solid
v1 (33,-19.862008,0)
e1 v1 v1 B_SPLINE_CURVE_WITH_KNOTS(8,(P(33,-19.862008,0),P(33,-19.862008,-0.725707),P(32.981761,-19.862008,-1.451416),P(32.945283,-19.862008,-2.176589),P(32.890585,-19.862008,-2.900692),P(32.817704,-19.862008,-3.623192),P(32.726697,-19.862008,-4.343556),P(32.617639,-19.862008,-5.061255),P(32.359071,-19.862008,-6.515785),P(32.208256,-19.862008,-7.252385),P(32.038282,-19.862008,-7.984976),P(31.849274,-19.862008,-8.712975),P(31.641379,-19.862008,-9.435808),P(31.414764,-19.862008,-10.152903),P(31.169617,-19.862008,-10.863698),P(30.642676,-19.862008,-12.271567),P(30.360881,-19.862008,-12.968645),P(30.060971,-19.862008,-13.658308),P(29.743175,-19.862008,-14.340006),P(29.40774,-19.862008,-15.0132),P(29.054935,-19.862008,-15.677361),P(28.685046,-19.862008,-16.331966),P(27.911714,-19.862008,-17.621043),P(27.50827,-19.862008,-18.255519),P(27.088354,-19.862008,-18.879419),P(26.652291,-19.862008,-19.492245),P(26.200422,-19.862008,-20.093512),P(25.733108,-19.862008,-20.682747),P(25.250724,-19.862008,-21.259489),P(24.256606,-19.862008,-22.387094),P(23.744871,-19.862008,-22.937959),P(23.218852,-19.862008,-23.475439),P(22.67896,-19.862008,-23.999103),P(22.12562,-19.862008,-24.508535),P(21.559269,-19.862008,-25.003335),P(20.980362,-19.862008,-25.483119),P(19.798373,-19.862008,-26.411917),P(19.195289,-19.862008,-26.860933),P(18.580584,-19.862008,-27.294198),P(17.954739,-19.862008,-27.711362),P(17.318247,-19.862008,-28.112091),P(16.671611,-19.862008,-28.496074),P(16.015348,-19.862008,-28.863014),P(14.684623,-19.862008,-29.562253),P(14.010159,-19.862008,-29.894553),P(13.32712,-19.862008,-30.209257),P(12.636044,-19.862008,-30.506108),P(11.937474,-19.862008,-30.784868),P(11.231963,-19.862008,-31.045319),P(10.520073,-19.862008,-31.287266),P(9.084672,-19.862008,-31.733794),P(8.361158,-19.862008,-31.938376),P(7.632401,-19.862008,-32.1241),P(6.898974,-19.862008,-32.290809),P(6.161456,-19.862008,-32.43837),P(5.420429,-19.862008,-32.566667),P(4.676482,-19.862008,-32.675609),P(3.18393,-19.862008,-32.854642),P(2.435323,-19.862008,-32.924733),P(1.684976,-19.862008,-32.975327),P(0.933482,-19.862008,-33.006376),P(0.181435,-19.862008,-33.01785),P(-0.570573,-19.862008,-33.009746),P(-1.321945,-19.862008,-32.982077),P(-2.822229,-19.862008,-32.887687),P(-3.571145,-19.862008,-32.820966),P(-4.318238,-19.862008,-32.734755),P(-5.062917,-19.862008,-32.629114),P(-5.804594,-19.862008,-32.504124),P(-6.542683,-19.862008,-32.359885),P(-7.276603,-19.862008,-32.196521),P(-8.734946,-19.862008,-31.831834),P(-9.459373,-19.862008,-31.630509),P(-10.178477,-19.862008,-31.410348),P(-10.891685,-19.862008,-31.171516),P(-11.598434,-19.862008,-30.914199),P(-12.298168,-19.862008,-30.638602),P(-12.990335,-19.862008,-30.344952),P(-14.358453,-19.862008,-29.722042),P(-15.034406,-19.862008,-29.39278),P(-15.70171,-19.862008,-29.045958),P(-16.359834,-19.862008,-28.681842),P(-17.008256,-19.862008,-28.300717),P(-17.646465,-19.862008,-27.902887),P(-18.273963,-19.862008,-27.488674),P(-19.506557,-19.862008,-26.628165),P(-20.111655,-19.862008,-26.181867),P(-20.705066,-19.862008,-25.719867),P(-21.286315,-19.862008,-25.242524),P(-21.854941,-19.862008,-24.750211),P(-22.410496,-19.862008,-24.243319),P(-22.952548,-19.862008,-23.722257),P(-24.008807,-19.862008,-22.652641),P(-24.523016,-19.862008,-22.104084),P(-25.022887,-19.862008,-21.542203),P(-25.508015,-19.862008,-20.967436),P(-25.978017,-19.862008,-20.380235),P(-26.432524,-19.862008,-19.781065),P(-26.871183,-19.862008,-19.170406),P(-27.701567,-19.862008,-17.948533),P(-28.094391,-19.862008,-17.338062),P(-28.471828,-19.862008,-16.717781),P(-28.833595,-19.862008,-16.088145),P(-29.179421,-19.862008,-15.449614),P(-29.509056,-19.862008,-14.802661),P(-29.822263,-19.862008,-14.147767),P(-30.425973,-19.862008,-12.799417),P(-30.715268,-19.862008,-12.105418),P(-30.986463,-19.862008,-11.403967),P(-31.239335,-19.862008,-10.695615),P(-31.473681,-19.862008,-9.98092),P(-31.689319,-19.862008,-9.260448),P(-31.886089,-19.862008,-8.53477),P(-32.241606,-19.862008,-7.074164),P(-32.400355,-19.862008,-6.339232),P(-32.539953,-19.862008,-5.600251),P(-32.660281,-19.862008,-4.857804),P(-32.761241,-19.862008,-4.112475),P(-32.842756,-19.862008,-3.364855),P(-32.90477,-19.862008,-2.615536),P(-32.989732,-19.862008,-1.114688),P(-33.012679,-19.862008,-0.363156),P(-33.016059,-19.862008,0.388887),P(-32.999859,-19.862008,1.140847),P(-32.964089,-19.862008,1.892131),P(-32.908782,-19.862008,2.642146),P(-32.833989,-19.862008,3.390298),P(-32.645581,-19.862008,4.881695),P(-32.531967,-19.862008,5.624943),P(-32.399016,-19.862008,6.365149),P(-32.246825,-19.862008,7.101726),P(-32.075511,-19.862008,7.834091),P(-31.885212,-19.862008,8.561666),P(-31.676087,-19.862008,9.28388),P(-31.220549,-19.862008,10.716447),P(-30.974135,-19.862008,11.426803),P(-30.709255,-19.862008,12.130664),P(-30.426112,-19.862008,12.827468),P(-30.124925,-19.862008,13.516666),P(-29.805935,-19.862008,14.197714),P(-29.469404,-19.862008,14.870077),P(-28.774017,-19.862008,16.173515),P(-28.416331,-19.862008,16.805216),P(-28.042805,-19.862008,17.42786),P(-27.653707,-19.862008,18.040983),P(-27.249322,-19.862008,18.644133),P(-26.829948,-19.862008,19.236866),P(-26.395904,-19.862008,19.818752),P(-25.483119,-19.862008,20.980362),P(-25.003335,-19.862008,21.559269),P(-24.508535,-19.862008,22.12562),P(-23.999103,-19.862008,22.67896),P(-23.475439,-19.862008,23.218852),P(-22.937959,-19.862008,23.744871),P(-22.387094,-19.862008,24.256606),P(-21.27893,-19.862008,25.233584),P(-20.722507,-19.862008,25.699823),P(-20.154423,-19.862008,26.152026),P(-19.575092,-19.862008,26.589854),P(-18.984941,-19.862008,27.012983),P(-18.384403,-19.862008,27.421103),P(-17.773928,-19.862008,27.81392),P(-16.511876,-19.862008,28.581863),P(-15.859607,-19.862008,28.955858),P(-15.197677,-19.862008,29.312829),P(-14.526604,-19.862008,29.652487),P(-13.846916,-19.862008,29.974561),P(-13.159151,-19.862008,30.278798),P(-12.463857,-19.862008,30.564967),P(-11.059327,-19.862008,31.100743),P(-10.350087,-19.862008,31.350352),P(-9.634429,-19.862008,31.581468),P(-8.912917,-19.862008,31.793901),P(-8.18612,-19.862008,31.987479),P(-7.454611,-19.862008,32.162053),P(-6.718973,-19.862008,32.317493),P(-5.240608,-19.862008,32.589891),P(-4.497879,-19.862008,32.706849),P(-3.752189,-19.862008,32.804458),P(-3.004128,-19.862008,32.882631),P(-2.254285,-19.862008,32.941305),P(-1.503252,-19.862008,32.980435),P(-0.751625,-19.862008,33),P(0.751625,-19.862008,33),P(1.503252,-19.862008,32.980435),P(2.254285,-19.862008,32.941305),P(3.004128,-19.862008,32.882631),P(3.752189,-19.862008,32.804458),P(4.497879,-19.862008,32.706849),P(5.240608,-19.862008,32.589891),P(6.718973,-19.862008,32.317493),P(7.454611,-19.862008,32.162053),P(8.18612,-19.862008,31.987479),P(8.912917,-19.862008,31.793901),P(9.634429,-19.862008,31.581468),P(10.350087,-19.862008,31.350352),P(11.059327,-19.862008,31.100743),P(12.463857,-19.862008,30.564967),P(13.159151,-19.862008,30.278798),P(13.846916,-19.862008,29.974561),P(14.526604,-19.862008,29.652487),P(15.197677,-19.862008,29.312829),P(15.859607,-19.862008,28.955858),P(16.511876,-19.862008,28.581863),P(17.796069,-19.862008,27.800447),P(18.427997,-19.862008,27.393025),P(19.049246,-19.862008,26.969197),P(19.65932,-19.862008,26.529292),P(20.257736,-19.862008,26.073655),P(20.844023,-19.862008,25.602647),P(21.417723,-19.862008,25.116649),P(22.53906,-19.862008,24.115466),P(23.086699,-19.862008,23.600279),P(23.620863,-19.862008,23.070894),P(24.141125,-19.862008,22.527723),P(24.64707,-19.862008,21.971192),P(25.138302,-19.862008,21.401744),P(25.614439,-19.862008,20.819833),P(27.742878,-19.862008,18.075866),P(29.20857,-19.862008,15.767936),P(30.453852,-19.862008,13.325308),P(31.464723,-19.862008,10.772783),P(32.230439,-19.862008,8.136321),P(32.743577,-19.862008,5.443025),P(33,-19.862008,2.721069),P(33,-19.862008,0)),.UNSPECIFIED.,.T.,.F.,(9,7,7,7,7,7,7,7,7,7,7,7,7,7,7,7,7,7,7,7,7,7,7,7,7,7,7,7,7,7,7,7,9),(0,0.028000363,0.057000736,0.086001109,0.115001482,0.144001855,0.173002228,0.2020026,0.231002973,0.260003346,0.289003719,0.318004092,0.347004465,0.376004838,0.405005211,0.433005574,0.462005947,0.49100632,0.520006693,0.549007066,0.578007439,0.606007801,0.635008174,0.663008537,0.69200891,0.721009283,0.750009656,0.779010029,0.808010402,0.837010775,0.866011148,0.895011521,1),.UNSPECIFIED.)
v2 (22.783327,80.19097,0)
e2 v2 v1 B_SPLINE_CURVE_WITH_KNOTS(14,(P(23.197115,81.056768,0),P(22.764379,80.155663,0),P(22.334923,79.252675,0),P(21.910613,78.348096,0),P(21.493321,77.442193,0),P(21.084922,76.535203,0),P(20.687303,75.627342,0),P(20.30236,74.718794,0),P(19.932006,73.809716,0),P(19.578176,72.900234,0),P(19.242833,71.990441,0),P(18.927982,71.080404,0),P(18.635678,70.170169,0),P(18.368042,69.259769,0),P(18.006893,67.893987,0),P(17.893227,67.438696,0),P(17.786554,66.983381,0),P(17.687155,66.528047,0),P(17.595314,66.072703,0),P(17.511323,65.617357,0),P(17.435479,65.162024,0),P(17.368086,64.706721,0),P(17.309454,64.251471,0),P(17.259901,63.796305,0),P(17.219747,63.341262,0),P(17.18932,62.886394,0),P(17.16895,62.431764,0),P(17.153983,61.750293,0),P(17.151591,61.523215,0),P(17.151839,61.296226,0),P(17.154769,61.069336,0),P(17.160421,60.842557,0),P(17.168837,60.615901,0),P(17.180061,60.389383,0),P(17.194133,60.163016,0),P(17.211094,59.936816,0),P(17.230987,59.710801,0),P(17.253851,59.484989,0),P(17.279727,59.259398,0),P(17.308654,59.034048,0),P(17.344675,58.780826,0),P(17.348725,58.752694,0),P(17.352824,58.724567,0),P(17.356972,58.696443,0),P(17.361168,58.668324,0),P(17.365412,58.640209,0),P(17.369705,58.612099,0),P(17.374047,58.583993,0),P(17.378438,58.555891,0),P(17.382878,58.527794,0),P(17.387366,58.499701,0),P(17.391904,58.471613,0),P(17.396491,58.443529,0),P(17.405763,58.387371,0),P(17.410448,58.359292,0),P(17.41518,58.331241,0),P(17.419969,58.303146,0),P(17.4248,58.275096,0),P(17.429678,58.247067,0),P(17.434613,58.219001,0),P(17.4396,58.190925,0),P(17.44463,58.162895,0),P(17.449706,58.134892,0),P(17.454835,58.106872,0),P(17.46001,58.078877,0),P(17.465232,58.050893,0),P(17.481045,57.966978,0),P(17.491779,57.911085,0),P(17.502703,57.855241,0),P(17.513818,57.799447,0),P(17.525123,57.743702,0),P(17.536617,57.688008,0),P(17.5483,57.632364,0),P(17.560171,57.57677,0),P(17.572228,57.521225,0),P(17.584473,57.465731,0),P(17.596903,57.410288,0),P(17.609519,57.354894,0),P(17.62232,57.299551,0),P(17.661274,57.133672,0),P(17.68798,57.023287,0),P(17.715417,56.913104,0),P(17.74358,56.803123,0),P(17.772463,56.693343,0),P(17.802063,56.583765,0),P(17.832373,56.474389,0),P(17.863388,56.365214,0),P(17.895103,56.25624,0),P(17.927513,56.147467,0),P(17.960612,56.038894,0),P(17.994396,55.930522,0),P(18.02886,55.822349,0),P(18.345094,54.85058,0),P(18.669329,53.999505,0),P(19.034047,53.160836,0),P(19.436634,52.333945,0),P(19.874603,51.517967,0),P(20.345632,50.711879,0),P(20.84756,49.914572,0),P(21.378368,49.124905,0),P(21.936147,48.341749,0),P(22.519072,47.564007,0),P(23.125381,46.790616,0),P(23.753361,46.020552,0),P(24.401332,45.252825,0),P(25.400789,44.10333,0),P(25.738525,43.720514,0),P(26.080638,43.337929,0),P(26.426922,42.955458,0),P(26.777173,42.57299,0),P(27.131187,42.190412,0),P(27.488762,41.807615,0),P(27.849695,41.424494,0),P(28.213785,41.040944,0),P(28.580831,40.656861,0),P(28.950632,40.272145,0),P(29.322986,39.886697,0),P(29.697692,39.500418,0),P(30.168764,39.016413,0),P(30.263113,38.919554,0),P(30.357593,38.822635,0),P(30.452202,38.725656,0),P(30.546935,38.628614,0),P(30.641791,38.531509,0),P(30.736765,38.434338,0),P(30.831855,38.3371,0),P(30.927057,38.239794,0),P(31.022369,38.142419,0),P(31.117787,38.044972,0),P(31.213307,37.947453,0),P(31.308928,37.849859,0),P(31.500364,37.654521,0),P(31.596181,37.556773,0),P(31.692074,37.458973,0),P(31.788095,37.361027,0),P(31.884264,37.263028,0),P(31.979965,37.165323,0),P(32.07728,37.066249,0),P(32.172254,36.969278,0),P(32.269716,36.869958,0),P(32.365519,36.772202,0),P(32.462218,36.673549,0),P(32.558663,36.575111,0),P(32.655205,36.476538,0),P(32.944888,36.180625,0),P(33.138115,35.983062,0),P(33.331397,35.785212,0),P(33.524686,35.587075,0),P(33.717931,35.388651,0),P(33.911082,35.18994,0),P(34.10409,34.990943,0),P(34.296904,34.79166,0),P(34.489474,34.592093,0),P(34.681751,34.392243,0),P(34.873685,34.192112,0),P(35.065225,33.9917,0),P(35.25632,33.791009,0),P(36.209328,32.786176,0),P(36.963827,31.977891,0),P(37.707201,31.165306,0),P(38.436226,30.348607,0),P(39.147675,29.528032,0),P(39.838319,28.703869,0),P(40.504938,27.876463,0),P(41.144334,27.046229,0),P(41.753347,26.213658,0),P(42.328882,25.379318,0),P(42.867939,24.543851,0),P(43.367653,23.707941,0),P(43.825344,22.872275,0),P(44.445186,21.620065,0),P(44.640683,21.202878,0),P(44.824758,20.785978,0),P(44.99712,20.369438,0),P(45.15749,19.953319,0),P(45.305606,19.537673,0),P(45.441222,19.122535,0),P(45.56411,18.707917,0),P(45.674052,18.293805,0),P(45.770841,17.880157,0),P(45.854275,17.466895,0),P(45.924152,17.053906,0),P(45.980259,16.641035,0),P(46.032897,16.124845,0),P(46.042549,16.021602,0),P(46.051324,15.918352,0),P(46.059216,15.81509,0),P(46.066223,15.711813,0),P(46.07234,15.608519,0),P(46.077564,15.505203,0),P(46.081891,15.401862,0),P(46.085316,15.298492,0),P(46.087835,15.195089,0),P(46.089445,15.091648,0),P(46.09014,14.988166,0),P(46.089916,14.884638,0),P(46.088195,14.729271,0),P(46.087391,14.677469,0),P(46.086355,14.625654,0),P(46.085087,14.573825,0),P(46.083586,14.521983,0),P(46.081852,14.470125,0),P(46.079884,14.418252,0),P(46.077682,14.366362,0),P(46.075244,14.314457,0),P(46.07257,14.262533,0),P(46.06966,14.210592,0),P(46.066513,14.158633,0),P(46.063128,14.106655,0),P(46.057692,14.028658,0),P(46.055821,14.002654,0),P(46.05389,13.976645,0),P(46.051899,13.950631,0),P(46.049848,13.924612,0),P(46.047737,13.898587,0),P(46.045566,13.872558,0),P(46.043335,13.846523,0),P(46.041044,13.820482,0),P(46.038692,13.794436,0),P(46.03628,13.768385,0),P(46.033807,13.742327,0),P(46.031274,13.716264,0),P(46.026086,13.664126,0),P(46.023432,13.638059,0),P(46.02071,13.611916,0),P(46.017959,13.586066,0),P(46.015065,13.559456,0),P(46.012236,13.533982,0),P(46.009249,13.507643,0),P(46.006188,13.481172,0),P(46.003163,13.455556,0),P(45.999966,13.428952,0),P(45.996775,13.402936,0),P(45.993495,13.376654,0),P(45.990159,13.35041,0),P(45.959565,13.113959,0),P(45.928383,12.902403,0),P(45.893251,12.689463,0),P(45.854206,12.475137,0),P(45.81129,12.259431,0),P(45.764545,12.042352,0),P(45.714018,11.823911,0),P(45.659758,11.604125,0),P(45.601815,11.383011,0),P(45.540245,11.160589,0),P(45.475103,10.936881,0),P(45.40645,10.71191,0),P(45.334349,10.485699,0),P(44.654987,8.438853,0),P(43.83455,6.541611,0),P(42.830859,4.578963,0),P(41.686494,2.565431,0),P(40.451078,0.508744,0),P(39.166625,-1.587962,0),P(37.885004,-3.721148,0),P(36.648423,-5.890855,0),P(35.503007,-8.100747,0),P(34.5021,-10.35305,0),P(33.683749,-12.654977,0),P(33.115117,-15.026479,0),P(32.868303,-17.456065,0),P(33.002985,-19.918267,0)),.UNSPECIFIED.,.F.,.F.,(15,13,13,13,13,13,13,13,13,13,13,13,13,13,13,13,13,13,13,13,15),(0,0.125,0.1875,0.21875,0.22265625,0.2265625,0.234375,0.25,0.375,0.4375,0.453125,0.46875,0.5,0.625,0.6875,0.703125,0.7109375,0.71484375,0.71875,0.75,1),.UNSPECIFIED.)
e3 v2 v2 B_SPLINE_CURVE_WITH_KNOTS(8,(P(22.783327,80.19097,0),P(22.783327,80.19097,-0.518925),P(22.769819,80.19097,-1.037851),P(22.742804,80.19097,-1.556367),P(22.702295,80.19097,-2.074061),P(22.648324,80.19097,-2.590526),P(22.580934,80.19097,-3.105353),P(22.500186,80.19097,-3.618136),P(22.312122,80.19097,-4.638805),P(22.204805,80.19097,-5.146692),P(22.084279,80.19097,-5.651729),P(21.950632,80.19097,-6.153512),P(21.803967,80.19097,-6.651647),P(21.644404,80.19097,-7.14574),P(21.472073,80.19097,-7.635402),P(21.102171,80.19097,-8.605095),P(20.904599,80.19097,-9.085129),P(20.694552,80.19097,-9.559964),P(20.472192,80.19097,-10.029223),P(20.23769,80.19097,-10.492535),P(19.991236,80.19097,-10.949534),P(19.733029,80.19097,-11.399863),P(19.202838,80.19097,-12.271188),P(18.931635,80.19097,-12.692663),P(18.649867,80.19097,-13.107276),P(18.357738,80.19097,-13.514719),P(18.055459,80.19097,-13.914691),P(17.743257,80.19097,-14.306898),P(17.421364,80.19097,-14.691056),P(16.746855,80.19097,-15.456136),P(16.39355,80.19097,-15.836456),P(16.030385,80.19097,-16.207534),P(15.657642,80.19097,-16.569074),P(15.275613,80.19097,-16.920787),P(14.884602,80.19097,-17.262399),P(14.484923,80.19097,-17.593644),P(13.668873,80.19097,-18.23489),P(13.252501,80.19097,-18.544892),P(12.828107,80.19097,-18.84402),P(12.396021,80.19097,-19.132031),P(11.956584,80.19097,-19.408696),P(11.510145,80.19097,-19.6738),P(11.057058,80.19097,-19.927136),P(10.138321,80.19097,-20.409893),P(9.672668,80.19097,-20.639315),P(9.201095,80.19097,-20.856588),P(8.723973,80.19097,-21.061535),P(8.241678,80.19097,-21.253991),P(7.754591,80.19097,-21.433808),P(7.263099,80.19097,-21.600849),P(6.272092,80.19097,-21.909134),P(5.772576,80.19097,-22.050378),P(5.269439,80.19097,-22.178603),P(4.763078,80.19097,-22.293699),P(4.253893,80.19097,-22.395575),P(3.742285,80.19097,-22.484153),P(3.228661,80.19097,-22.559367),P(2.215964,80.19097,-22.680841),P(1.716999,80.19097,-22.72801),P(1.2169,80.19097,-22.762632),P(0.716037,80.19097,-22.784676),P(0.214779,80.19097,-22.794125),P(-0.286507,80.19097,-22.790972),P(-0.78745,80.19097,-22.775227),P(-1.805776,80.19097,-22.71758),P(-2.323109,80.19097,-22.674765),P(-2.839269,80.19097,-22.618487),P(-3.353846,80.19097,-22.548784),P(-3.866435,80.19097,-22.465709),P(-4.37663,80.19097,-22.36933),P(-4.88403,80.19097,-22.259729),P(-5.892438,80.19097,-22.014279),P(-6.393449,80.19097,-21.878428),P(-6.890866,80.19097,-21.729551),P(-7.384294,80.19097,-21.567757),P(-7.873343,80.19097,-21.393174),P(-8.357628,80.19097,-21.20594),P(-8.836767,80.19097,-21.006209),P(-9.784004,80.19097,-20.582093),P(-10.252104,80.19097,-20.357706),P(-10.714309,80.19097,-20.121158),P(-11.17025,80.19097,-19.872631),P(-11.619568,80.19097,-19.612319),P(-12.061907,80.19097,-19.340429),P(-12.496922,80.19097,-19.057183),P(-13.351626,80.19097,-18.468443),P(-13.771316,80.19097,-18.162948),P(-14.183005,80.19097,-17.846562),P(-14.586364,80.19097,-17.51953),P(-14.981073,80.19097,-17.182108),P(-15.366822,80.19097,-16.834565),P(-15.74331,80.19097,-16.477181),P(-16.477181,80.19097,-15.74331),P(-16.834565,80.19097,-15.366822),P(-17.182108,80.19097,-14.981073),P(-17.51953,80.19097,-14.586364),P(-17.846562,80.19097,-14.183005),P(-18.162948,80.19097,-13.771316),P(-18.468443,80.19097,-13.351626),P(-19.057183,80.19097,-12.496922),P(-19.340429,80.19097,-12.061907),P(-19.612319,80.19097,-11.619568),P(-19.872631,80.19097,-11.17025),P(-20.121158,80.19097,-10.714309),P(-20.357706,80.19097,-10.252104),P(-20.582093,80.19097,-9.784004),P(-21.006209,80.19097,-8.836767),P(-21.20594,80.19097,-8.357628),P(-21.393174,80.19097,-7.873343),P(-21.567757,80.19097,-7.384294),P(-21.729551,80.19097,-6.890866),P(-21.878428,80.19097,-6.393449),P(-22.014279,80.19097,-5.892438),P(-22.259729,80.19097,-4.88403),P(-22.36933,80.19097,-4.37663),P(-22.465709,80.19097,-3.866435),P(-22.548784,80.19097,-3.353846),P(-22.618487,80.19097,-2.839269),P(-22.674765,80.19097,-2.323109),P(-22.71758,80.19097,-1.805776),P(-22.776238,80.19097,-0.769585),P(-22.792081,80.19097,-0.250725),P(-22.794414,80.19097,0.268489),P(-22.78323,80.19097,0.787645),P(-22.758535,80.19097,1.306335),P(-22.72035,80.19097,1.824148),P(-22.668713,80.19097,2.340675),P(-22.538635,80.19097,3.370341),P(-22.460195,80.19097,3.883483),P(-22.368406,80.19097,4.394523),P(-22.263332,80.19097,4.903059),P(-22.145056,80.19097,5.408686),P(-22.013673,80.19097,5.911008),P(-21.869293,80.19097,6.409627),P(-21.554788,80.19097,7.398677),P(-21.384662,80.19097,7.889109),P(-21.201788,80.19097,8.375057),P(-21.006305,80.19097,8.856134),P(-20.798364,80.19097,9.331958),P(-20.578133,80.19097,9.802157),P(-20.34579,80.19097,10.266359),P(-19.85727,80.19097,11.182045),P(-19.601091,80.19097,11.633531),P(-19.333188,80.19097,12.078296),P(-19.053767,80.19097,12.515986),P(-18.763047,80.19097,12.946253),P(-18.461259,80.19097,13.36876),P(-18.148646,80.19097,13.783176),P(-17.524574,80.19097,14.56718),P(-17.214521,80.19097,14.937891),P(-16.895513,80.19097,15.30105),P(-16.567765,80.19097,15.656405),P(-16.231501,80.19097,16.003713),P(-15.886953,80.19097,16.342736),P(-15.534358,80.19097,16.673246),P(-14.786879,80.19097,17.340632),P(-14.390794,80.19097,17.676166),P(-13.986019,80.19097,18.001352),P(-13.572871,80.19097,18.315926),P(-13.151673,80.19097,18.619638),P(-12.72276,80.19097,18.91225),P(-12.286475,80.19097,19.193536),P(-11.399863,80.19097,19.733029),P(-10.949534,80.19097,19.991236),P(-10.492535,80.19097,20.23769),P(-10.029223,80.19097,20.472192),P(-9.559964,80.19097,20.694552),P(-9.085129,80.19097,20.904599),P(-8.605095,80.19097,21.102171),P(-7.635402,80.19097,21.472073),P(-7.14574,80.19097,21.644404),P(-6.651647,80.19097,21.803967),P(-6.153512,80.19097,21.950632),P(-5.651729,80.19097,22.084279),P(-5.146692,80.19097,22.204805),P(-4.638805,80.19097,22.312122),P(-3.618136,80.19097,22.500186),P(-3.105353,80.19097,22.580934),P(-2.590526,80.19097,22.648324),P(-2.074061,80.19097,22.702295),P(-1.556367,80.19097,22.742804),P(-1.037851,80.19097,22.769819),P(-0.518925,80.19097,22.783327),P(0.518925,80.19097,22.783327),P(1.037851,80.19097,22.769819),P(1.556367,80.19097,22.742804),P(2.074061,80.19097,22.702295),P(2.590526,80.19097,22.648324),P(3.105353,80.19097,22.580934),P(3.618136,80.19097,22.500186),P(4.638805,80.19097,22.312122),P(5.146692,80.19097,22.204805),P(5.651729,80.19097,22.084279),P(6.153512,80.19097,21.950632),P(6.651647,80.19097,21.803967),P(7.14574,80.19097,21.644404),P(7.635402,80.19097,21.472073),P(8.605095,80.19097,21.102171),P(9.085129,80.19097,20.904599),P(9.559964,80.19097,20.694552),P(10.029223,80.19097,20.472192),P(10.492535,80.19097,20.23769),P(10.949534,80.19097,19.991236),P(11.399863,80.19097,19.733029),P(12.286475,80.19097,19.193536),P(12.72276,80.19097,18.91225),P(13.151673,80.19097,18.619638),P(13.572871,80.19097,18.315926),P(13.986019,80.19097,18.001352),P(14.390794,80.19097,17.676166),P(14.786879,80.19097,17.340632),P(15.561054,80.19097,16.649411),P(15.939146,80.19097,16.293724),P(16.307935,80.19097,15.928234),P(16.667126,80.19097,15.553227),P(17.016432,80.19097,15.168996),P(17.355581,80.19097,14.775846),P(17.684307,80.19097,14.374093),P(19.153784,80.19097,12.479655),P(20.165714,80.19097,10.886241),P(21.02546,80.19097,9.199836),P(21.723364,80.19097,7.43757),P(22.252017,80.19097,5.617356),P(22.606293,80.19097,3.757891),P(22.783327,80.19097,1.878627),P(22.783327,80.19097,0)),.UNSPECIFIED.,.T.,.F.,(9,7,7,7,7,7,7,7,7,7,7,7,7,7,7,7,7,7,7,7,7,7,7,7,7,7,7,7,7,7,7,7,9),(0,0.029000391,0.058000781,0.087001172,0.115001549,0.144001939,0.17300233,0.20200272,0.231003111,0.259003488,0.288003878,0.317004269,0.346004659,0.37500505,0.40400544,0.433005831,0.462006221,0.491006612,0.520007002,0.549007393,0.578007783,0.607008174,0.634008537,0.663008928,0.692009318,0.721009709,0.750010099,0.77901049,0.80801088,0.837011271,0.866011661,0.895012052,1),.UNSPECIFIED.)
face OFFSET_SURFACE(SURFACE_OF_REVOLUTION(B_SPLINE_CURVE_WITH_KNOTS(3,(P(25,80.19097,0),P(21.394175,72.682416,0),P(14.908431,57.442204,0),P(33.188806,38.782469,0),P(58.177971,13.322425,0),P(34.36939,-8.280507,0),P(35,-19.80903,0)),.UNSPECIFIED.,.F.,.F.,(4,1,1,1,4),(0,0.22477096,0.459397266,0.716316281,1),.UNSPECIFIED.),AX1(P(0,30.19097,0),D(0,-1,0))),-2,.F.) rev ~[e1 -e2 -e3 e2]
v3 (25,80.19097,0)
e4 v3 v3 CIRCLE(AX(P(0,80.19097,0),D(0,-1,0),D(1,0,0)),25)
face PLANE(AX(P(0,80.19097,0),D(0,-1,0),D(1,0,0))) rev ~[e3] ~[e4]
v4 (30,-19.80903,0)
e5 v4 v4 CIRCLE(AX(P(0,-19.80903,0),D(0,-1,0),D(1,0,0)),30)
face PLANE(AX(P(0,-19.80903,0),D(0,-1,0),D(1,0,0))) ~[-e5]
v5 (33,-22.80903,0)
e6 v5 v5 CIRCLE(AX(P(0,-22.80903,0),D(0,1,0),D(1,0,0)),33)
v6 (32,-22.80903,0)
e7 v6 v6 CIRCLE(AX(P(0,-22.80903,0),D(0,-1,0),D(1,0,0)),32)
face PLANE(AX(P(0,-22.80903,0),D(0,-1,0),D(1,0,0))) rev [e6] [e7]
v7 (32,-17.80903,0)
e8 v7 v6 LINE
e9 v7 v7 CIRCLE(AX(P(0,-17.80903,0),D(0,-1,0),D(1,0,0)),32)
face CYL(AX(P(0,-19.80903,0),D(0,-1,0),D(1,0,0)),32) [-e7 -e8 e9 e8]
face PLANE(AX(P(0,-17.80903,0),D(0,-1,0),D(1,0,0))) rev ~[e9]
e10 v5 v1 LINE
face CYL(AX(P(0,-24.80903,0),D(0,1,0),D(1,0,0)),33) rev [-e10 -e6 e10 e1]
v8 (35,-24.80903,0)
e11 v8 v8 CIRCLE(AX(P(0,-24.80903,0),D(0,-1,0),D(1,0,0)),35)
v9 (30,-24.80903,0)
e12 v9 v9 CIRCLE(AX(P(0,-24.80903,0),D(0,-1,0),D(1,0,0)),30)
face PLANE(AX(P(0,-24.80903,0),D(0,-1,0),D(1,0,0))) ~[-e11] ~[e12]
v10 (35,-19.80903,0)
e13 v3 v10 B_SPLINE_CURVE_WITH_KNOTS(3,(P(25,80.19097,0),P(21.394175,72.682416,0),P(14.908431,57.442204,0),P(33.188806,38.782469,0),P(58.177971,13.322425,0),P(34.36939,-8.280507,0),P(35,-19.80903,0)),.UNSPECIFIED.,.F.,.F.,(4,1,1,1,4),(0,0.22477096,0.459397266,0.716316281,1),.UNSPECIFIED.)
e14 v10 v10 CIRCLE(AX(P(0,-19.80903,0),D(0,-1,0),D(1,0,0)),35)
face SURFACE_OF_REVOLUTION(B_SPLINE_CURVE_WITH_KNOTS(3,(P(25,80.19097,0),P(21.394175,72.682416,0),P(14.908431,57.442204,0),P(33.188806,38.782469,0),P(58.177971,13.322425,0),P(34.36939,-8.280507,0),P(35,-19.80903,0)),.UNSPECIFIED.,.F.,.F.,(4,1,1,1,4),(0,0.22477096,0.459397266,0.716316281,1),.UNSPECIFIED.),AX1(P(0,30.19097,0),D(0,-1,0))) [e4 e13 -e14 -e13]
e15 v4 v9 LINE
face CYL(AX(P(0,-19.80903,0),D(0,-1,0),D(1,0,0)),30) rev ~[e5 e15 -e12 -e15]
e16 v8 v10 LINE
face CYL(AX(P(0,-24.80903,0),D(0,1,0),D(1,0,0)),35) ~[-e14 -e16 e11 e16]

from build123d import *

# Parameters (mm, degrees)
F2_T = 2


# Not quite as in the source:
# - a shell that OpenCascade refuses in one call is made with other operations: the cavity is built on its own and cut out


with BuildPart() as f1:
    # F0 (on Top) → F1 (revolve)
    with BuildSketch(Plane.XY):
        with BuildLine():
            add(Edge.make_bspline(
                [(25, 80.1909700036), (21.3941747588, 72.6824155929), (14.9084310427, 57.4422037156), (33.1888057684, 38.7824688485), (58.1779709373, 13.3224245963), (34.3693904579, -8.2805072889), (35, -19.8090299964)],
                knots=[0, 0, 0, 0, 0.2247709599, 0.4593972663, 0.716316281, 1, 1, 1, 1], degree=3))
            Line((25, 80.1909700036), (0, 80.1909700036))
            Line((0, 80.1909700036), (0, -19.8090299964))
            Line((0, -19.8090299964), (30, -19.8090299964))
            Line((30, -19.8090299964), (30, -24.8090299964))
            Line((30, -24.8090299964), (35, -24.8090299964))
            Line((35, -24.8090299964), (35, -19.8090299964))
        make_face()
    revolve(axis=Axis((0, 30.1909700036, 0), (0, -1, 0)))

    # F2: shell of thickness 2, made by hand


with BuildPart() as f2_core1:
    # F2_t2: copy of F1
    add(f1.part)

    # the walls: a layer under each face that stays
    f2_faces = [f2_core1.faces().sort_by_distance(p)[0] for p in [
        (-36.8980626212, 34.9663384335, 0),
        (-35, -22.3090299964, 0),
        (23.3333333333, -24.8090299964, -23.3333333333),
        (-30, -22.3090299964, 0),
        (0, -19.8090299964, 0),
    ]]
    thicken(f2_faces, amount=-F2_T, mode=Mode.SUBTRACT)

    # F2_s3 → F2_t4 (revolve, cut)
    with BuildSketch(Plane.XY):
        Polygon((29.98, -19.8290299964), (32, -19.8090299964), (32, -17.8090299964), (30, -17.8090299964), align=None)
    revolve(axis=Axis((0, -19.8090299964, 0), (0, -1, 0)), mode=Mode.SUBTRACT)


with BuildPart() as f1_1:
    add(f1.part)

    # what is left inside the walls is the cavity
    f2_cavity = [f2_core1.part.solids().sort_by_distance(p)[0] for p in [
        (-22.512298, 47.591043, 0),
    ]]
    add(f2_cavity, mode=Mode.SUBTRACT)


solid = f1_1.part
